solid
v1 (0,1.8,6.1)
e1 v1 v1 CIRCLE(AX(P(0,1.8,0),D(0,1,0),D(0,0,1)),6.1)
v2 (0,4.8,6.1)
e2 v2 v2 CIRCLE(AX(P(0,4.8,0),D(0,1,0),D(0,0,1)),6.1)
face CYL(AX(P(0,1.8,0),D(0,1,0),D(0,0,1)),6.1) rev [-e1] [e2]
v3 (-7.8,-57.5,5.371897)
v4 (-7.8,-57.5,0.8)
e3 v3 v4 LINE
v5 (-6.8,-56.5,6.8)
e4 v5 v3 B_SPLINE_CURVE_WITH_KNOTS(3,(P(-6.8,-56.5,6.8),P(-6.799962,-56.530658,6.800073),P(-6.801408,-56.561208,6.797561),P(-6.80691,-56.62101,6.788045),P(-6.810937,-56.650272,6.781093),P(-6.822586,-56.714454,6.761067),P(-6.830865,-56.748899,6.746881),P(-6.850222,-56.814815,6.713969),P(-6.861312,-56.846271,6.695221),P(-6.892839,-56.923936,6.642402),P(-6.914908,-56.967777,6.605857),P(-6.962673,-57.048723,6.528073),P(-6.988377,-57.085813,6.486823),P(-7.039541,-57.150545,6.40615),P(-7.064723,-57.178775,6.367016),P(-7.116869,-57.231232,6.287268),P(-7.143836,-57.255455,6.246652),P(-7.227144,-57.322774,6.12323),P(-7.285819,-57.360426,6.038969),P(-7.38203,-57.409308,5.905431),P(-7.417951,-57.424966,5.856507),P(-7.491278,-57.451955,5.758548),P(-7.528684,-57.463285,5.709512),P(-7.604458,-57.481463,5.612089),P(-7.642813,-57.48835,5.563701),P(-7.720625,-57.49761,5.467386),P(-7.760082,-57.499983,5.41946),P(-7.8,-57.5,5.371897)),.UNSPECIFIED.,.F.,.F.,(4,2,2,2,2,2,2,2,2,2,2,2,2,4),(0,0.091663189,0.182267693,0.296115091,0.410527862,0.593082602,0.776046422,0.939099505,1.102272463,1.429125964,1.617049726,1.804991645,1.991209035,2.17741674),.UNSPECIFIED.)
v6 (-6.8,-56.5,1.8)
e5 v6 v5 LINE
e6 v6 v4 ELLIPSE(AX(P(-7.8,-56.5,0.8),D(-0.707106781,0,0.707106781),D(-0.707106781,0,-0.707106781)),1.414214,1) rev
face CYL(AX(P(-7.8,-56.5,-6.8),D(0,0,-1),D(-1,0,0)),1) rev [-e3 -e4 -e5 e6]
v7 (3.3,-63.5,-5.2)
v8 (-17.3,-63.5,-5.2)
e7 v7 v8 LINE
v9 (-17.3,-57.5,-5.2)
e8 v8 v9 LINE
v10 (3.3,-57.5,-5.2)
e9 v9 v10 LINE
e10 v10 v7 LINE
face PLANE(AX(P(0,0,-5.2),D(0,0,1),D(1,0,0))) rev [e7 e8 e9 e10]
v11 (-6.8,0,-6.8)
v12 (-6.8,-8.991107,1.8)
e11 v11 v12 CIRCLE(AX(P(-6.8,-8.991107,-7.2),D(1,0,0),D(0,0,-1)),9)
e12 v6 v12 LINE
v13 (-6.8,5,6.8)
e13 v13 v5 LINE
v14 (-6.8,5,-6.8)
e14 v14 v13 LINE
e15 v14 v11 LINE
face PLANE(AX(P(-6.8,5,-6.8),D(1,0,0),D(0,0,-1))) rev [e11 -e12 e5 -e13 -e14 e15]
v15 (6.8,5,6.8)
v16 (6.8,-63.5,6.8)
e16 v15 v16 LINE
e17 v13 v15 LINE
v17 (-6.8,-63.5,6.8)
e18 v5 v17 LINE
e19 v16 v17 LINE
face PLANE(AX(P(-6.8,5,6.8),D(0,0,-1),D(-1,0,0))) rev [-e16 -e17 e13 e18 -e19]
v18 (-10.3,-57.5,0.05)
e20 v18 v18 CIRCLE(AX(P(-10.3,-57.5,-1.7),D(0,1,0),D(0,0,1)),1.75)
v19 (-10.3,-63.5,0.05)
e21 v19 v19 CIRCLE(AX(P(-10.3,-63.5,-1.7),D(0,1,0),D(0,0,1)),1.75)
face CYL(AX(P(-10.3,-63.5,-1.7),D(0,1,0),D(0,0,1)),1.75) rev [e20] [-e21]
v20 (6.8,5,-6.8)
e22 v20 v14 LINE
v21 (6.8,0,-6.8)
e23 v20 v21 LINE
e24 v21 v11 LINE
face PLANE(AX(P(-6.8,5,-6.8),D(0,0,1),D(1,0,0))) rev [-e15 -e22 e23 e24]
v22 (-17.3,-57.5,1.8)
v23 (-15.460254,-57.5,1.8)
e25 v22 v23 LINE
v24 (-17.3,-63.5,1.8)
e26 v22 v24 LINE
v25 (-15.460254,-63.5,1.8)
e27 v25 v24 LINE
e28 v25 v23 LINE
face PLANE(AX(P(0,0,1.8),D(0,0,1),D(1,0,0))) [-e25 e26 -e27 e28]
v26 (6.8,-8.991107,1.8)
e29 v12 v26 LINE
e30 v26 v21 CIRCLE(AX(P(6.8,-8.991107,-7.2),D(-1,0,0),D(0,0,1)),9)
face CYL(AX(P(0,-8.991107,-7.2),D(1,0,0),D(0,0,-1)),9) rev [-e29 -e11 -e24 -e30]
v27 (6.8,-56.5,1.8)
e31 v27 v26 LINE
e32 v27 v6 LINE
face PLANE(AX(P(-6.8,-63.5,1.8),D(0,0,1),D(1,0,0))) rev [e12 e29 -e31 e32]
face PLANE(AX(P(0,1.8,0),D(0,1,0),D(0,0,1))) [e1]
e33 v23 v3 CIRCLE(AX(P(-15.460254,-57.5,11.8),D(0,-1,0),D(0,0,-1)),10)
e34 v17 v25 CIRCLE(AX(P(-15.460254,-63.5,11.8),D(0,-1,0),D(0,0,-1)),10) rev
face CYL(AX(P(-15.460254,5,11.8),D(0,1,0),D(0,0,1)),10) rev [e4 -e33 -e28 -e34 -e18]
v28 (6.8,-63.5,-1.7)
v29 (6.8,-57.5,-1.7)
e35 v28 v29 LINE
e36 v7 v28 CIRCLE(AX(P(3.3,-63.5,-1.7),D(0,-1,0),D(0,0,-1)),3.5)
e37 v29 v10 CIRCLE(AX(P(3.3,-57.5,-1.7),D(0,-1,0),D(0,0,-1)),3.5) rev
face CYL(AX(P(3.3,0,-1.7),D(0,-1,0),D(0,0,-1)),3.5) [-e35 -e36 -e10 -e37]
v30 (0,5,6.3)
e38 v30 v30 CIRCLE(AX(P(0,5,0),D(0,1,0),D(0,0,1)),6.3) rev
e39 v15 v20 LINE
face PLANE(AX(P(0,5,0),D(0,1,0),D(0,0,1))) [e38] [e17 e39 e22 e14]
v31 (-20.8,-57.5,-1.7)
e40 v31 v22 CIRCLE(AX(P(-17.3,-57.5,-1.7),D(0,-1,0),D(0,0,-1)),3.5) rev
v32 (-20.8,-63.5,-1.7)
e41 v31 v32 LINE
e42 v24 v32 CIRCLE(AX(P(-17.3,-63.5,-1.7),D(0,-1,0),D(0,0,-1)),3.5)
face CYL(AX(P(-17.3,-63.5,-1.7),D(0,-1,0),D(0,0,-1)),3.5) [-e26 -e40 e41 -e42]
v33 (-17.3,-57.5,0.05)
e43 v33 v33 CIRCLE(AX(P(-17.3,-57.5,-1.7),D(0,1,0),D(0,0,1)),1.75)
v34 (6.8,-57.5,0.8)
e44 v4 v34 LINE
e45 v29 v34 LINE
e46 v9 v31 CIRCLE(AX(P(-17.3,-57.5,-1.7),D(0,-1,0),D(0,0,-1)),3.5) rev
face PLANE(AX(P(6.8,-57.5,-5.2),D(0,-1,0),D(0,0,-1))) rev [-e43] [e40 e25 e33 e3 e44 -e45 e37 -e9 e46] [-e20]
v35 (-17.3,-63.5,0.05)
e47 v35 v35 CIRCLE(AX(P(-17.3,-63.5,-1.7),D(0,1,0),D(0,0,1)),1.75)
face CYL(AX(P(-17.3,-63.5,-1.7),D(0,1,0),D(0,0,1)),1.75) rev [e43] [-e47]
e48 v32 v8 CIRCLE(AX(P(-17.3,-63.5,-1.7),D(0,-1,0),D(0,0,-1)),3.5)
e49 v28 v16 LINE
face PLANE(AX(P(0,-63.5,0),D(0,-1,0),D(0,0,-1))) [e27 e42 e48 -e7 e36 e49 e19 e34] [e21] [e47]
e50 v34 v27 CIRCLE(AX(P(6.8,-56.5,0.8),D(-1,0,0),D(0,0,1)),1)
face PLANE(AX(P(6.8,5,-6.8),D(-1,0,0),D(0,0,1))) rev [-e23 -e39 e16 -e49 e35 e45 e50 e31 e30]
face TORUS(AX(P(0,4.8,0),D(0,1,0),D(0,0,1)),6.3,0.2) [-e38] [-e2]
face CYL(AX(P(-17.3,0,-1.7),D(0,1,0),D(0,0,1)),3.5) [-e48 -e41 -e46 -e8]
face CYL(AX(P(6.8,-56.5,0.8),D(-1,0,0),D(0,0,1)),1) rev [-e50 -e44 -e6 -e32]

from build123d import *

# Parameters (mm, degrees)
SKETCH1_W           = 13.6
SKETCH1_H           = 13.6
BOSS_EXTRUDE1_DEPTH = 5
SKETCH2_R           = 6.1
CUT_EXTRUDE1_DEPTH  = 3.2
SKETCH3_W           = 13.6
SKETCH3_H           = 5
BOSS_EXTRUDE2_DEPTH = 63.5
FILLET1_R           = 0.2
FILLET2_R           = 9
SKETCH10_W          = 27.6
SKETCH10_H          = 6
BOSS_EXTRUDE5_DEPTH = 7
SKETCH11_R          = 1.75
CUT_EXTRUDE4_DEPTH  = 67.220314104
FILLET3_R           = 10
FILLET4_R           = 3.5
FILLET5_R           = 1


# Some blends are built 0.0001 mm under size
with BuildPart() as part:
    # Sketch1 → Boss-Extrude1 (new body)
    with BuildSketch(Plane(origin=(0, 0, 0), x_dir=(1, 0, 0), z_dir=(0, 1, 0))):
        Rectangle(SKETCH1_W, SKETCH1_H)
    extrude(amount=BOSS_EXTRUDE1_DEPTH)

    # Sketch2 → Cut-Extrude1 (cut)
    with BuildSketch(Plane(origin=(0, 5, 0), x_dir=(1, 0, 0), z_dir=(0, 1, 0))):
        with Locations(Location((0, 0, 0), (0, 0, 270))):
            Circle(SKETCH2_R)
    extrude(amount=-CUT_EXTRUDE1_DEPTH, mode=Mode.SUBTRACT)

    # Sketch3 → Boss-Extrude2 (add)
    with BuildSketch(Plane.XZ):
        with Locations((0, 4.3)):
            Rectangle(SKETCH3_W, SKETCH3_H)
    extrude(amount=BOSS_EXTRUDE2_DEPTH)

    # Fillet1
    fillet1_edges = [part.edges().sort_by_distance(p)[0] for p in [
        (0, 5, -6.1),
    ]]
    fillet(fillet1_edges, radius=FILLET1_R)

    # Fillet2
    # the kernel refuses this fillet: 9 mm, written as the material it adds along each edge
    with BuildSketch(Plane(origin=(6.8, 0, 1.8), x_dir=(0, 0, -1), z_dir=(-1, 0, 0))) as fillet2_piece_1:
        with BuildLine():
            CenterArc((9, 8.991106717), FILLET2_R, 180, 87.452681817)
            Line((0, 8.991106717), (-0.18, 8.991106717))
            Line((-0.18, 8.991106717), (-0.18, 0))
            Line((-0.18, 0), (0, -0.18))
            ThreePointArc((0, -0.18), (4.3, -0.18), (8.592, -0.179822134))
            Line((8.592, -0.179822134), (8.6, 0))
        make_face()
    extrude(amount=13.6)

    # Sketch10 → Boss-Extrude5 (add)
    with BuildSketch(Plane(origin=(0, 0, 1.8), x_dir=(-1, 0, 0), z_dir=(0, 0, -1))):
        with Locations((7, -60.5)):
            Rectangle(SKETCH10_W, SKETCH10_H)
    extrude(amount=BOSS_EXTRUDE5_DEPTH)

    # Sketch11 → Cut-Extrude4 (cut, through all)
    with BuildSketch(Plane(origin=(0, -57.5, 0), x_dir=(1, 0, 0), z_dir=(0, 1, 0))):
        with Locations(Location((-10.3, 1.7, 0), (0, 0, 270))):
            Circle(SKETCH11_R)
        with Locations(Location((-17.3, 1.7, 0), (0, 0, 270))):
            Circle(SKETCH11_R)
    extrude(amount=-CUT_EXTRUDE4_DEPTH, mode=Mode.SUBTRACT)

    # Fillet3
    # the kernel refuses this fillet: 10 mm, written as the material it adds along each edge
    with BuildSketch(Plane(origin=(-6.8, -57.5, 1.8), x_dir=(0, 0, 1), z_dir=(0, -1, 0))) as fillet3_piece_1:
        with BuildLine():
            CenterArc((10, 8.660254038), FILLET3_R, 180, 60)
            Line((0, 8.660254038), (0, 0))
            Line((0, 0), (5, 0))
        make_face()
    extrude(amount=6)

    # Fillet4
    fillet4_edges = [part.edges().sort_by_distance(p)[0] for p in [
        (-20.8, -60.5, 1.8),
        (-20.8, -60.5, -5.2),
        (6.8, -60.5, -5.2),
    ]]
    fillet(fillet4_edges, radius=FILLET4_R - 0.0001)  # a hair under: the kernel refuses the full size

    # Fillet5
    fillet5_edges = [part.edges().sort_by_distance(p)[0] for p in [
        (0, -57.5, 1.8),
        (-6.8, -57.5, 4.3),
    ]]
    fillet(fillet5_edges, radius=FILLET5_R)


solid = part.part
